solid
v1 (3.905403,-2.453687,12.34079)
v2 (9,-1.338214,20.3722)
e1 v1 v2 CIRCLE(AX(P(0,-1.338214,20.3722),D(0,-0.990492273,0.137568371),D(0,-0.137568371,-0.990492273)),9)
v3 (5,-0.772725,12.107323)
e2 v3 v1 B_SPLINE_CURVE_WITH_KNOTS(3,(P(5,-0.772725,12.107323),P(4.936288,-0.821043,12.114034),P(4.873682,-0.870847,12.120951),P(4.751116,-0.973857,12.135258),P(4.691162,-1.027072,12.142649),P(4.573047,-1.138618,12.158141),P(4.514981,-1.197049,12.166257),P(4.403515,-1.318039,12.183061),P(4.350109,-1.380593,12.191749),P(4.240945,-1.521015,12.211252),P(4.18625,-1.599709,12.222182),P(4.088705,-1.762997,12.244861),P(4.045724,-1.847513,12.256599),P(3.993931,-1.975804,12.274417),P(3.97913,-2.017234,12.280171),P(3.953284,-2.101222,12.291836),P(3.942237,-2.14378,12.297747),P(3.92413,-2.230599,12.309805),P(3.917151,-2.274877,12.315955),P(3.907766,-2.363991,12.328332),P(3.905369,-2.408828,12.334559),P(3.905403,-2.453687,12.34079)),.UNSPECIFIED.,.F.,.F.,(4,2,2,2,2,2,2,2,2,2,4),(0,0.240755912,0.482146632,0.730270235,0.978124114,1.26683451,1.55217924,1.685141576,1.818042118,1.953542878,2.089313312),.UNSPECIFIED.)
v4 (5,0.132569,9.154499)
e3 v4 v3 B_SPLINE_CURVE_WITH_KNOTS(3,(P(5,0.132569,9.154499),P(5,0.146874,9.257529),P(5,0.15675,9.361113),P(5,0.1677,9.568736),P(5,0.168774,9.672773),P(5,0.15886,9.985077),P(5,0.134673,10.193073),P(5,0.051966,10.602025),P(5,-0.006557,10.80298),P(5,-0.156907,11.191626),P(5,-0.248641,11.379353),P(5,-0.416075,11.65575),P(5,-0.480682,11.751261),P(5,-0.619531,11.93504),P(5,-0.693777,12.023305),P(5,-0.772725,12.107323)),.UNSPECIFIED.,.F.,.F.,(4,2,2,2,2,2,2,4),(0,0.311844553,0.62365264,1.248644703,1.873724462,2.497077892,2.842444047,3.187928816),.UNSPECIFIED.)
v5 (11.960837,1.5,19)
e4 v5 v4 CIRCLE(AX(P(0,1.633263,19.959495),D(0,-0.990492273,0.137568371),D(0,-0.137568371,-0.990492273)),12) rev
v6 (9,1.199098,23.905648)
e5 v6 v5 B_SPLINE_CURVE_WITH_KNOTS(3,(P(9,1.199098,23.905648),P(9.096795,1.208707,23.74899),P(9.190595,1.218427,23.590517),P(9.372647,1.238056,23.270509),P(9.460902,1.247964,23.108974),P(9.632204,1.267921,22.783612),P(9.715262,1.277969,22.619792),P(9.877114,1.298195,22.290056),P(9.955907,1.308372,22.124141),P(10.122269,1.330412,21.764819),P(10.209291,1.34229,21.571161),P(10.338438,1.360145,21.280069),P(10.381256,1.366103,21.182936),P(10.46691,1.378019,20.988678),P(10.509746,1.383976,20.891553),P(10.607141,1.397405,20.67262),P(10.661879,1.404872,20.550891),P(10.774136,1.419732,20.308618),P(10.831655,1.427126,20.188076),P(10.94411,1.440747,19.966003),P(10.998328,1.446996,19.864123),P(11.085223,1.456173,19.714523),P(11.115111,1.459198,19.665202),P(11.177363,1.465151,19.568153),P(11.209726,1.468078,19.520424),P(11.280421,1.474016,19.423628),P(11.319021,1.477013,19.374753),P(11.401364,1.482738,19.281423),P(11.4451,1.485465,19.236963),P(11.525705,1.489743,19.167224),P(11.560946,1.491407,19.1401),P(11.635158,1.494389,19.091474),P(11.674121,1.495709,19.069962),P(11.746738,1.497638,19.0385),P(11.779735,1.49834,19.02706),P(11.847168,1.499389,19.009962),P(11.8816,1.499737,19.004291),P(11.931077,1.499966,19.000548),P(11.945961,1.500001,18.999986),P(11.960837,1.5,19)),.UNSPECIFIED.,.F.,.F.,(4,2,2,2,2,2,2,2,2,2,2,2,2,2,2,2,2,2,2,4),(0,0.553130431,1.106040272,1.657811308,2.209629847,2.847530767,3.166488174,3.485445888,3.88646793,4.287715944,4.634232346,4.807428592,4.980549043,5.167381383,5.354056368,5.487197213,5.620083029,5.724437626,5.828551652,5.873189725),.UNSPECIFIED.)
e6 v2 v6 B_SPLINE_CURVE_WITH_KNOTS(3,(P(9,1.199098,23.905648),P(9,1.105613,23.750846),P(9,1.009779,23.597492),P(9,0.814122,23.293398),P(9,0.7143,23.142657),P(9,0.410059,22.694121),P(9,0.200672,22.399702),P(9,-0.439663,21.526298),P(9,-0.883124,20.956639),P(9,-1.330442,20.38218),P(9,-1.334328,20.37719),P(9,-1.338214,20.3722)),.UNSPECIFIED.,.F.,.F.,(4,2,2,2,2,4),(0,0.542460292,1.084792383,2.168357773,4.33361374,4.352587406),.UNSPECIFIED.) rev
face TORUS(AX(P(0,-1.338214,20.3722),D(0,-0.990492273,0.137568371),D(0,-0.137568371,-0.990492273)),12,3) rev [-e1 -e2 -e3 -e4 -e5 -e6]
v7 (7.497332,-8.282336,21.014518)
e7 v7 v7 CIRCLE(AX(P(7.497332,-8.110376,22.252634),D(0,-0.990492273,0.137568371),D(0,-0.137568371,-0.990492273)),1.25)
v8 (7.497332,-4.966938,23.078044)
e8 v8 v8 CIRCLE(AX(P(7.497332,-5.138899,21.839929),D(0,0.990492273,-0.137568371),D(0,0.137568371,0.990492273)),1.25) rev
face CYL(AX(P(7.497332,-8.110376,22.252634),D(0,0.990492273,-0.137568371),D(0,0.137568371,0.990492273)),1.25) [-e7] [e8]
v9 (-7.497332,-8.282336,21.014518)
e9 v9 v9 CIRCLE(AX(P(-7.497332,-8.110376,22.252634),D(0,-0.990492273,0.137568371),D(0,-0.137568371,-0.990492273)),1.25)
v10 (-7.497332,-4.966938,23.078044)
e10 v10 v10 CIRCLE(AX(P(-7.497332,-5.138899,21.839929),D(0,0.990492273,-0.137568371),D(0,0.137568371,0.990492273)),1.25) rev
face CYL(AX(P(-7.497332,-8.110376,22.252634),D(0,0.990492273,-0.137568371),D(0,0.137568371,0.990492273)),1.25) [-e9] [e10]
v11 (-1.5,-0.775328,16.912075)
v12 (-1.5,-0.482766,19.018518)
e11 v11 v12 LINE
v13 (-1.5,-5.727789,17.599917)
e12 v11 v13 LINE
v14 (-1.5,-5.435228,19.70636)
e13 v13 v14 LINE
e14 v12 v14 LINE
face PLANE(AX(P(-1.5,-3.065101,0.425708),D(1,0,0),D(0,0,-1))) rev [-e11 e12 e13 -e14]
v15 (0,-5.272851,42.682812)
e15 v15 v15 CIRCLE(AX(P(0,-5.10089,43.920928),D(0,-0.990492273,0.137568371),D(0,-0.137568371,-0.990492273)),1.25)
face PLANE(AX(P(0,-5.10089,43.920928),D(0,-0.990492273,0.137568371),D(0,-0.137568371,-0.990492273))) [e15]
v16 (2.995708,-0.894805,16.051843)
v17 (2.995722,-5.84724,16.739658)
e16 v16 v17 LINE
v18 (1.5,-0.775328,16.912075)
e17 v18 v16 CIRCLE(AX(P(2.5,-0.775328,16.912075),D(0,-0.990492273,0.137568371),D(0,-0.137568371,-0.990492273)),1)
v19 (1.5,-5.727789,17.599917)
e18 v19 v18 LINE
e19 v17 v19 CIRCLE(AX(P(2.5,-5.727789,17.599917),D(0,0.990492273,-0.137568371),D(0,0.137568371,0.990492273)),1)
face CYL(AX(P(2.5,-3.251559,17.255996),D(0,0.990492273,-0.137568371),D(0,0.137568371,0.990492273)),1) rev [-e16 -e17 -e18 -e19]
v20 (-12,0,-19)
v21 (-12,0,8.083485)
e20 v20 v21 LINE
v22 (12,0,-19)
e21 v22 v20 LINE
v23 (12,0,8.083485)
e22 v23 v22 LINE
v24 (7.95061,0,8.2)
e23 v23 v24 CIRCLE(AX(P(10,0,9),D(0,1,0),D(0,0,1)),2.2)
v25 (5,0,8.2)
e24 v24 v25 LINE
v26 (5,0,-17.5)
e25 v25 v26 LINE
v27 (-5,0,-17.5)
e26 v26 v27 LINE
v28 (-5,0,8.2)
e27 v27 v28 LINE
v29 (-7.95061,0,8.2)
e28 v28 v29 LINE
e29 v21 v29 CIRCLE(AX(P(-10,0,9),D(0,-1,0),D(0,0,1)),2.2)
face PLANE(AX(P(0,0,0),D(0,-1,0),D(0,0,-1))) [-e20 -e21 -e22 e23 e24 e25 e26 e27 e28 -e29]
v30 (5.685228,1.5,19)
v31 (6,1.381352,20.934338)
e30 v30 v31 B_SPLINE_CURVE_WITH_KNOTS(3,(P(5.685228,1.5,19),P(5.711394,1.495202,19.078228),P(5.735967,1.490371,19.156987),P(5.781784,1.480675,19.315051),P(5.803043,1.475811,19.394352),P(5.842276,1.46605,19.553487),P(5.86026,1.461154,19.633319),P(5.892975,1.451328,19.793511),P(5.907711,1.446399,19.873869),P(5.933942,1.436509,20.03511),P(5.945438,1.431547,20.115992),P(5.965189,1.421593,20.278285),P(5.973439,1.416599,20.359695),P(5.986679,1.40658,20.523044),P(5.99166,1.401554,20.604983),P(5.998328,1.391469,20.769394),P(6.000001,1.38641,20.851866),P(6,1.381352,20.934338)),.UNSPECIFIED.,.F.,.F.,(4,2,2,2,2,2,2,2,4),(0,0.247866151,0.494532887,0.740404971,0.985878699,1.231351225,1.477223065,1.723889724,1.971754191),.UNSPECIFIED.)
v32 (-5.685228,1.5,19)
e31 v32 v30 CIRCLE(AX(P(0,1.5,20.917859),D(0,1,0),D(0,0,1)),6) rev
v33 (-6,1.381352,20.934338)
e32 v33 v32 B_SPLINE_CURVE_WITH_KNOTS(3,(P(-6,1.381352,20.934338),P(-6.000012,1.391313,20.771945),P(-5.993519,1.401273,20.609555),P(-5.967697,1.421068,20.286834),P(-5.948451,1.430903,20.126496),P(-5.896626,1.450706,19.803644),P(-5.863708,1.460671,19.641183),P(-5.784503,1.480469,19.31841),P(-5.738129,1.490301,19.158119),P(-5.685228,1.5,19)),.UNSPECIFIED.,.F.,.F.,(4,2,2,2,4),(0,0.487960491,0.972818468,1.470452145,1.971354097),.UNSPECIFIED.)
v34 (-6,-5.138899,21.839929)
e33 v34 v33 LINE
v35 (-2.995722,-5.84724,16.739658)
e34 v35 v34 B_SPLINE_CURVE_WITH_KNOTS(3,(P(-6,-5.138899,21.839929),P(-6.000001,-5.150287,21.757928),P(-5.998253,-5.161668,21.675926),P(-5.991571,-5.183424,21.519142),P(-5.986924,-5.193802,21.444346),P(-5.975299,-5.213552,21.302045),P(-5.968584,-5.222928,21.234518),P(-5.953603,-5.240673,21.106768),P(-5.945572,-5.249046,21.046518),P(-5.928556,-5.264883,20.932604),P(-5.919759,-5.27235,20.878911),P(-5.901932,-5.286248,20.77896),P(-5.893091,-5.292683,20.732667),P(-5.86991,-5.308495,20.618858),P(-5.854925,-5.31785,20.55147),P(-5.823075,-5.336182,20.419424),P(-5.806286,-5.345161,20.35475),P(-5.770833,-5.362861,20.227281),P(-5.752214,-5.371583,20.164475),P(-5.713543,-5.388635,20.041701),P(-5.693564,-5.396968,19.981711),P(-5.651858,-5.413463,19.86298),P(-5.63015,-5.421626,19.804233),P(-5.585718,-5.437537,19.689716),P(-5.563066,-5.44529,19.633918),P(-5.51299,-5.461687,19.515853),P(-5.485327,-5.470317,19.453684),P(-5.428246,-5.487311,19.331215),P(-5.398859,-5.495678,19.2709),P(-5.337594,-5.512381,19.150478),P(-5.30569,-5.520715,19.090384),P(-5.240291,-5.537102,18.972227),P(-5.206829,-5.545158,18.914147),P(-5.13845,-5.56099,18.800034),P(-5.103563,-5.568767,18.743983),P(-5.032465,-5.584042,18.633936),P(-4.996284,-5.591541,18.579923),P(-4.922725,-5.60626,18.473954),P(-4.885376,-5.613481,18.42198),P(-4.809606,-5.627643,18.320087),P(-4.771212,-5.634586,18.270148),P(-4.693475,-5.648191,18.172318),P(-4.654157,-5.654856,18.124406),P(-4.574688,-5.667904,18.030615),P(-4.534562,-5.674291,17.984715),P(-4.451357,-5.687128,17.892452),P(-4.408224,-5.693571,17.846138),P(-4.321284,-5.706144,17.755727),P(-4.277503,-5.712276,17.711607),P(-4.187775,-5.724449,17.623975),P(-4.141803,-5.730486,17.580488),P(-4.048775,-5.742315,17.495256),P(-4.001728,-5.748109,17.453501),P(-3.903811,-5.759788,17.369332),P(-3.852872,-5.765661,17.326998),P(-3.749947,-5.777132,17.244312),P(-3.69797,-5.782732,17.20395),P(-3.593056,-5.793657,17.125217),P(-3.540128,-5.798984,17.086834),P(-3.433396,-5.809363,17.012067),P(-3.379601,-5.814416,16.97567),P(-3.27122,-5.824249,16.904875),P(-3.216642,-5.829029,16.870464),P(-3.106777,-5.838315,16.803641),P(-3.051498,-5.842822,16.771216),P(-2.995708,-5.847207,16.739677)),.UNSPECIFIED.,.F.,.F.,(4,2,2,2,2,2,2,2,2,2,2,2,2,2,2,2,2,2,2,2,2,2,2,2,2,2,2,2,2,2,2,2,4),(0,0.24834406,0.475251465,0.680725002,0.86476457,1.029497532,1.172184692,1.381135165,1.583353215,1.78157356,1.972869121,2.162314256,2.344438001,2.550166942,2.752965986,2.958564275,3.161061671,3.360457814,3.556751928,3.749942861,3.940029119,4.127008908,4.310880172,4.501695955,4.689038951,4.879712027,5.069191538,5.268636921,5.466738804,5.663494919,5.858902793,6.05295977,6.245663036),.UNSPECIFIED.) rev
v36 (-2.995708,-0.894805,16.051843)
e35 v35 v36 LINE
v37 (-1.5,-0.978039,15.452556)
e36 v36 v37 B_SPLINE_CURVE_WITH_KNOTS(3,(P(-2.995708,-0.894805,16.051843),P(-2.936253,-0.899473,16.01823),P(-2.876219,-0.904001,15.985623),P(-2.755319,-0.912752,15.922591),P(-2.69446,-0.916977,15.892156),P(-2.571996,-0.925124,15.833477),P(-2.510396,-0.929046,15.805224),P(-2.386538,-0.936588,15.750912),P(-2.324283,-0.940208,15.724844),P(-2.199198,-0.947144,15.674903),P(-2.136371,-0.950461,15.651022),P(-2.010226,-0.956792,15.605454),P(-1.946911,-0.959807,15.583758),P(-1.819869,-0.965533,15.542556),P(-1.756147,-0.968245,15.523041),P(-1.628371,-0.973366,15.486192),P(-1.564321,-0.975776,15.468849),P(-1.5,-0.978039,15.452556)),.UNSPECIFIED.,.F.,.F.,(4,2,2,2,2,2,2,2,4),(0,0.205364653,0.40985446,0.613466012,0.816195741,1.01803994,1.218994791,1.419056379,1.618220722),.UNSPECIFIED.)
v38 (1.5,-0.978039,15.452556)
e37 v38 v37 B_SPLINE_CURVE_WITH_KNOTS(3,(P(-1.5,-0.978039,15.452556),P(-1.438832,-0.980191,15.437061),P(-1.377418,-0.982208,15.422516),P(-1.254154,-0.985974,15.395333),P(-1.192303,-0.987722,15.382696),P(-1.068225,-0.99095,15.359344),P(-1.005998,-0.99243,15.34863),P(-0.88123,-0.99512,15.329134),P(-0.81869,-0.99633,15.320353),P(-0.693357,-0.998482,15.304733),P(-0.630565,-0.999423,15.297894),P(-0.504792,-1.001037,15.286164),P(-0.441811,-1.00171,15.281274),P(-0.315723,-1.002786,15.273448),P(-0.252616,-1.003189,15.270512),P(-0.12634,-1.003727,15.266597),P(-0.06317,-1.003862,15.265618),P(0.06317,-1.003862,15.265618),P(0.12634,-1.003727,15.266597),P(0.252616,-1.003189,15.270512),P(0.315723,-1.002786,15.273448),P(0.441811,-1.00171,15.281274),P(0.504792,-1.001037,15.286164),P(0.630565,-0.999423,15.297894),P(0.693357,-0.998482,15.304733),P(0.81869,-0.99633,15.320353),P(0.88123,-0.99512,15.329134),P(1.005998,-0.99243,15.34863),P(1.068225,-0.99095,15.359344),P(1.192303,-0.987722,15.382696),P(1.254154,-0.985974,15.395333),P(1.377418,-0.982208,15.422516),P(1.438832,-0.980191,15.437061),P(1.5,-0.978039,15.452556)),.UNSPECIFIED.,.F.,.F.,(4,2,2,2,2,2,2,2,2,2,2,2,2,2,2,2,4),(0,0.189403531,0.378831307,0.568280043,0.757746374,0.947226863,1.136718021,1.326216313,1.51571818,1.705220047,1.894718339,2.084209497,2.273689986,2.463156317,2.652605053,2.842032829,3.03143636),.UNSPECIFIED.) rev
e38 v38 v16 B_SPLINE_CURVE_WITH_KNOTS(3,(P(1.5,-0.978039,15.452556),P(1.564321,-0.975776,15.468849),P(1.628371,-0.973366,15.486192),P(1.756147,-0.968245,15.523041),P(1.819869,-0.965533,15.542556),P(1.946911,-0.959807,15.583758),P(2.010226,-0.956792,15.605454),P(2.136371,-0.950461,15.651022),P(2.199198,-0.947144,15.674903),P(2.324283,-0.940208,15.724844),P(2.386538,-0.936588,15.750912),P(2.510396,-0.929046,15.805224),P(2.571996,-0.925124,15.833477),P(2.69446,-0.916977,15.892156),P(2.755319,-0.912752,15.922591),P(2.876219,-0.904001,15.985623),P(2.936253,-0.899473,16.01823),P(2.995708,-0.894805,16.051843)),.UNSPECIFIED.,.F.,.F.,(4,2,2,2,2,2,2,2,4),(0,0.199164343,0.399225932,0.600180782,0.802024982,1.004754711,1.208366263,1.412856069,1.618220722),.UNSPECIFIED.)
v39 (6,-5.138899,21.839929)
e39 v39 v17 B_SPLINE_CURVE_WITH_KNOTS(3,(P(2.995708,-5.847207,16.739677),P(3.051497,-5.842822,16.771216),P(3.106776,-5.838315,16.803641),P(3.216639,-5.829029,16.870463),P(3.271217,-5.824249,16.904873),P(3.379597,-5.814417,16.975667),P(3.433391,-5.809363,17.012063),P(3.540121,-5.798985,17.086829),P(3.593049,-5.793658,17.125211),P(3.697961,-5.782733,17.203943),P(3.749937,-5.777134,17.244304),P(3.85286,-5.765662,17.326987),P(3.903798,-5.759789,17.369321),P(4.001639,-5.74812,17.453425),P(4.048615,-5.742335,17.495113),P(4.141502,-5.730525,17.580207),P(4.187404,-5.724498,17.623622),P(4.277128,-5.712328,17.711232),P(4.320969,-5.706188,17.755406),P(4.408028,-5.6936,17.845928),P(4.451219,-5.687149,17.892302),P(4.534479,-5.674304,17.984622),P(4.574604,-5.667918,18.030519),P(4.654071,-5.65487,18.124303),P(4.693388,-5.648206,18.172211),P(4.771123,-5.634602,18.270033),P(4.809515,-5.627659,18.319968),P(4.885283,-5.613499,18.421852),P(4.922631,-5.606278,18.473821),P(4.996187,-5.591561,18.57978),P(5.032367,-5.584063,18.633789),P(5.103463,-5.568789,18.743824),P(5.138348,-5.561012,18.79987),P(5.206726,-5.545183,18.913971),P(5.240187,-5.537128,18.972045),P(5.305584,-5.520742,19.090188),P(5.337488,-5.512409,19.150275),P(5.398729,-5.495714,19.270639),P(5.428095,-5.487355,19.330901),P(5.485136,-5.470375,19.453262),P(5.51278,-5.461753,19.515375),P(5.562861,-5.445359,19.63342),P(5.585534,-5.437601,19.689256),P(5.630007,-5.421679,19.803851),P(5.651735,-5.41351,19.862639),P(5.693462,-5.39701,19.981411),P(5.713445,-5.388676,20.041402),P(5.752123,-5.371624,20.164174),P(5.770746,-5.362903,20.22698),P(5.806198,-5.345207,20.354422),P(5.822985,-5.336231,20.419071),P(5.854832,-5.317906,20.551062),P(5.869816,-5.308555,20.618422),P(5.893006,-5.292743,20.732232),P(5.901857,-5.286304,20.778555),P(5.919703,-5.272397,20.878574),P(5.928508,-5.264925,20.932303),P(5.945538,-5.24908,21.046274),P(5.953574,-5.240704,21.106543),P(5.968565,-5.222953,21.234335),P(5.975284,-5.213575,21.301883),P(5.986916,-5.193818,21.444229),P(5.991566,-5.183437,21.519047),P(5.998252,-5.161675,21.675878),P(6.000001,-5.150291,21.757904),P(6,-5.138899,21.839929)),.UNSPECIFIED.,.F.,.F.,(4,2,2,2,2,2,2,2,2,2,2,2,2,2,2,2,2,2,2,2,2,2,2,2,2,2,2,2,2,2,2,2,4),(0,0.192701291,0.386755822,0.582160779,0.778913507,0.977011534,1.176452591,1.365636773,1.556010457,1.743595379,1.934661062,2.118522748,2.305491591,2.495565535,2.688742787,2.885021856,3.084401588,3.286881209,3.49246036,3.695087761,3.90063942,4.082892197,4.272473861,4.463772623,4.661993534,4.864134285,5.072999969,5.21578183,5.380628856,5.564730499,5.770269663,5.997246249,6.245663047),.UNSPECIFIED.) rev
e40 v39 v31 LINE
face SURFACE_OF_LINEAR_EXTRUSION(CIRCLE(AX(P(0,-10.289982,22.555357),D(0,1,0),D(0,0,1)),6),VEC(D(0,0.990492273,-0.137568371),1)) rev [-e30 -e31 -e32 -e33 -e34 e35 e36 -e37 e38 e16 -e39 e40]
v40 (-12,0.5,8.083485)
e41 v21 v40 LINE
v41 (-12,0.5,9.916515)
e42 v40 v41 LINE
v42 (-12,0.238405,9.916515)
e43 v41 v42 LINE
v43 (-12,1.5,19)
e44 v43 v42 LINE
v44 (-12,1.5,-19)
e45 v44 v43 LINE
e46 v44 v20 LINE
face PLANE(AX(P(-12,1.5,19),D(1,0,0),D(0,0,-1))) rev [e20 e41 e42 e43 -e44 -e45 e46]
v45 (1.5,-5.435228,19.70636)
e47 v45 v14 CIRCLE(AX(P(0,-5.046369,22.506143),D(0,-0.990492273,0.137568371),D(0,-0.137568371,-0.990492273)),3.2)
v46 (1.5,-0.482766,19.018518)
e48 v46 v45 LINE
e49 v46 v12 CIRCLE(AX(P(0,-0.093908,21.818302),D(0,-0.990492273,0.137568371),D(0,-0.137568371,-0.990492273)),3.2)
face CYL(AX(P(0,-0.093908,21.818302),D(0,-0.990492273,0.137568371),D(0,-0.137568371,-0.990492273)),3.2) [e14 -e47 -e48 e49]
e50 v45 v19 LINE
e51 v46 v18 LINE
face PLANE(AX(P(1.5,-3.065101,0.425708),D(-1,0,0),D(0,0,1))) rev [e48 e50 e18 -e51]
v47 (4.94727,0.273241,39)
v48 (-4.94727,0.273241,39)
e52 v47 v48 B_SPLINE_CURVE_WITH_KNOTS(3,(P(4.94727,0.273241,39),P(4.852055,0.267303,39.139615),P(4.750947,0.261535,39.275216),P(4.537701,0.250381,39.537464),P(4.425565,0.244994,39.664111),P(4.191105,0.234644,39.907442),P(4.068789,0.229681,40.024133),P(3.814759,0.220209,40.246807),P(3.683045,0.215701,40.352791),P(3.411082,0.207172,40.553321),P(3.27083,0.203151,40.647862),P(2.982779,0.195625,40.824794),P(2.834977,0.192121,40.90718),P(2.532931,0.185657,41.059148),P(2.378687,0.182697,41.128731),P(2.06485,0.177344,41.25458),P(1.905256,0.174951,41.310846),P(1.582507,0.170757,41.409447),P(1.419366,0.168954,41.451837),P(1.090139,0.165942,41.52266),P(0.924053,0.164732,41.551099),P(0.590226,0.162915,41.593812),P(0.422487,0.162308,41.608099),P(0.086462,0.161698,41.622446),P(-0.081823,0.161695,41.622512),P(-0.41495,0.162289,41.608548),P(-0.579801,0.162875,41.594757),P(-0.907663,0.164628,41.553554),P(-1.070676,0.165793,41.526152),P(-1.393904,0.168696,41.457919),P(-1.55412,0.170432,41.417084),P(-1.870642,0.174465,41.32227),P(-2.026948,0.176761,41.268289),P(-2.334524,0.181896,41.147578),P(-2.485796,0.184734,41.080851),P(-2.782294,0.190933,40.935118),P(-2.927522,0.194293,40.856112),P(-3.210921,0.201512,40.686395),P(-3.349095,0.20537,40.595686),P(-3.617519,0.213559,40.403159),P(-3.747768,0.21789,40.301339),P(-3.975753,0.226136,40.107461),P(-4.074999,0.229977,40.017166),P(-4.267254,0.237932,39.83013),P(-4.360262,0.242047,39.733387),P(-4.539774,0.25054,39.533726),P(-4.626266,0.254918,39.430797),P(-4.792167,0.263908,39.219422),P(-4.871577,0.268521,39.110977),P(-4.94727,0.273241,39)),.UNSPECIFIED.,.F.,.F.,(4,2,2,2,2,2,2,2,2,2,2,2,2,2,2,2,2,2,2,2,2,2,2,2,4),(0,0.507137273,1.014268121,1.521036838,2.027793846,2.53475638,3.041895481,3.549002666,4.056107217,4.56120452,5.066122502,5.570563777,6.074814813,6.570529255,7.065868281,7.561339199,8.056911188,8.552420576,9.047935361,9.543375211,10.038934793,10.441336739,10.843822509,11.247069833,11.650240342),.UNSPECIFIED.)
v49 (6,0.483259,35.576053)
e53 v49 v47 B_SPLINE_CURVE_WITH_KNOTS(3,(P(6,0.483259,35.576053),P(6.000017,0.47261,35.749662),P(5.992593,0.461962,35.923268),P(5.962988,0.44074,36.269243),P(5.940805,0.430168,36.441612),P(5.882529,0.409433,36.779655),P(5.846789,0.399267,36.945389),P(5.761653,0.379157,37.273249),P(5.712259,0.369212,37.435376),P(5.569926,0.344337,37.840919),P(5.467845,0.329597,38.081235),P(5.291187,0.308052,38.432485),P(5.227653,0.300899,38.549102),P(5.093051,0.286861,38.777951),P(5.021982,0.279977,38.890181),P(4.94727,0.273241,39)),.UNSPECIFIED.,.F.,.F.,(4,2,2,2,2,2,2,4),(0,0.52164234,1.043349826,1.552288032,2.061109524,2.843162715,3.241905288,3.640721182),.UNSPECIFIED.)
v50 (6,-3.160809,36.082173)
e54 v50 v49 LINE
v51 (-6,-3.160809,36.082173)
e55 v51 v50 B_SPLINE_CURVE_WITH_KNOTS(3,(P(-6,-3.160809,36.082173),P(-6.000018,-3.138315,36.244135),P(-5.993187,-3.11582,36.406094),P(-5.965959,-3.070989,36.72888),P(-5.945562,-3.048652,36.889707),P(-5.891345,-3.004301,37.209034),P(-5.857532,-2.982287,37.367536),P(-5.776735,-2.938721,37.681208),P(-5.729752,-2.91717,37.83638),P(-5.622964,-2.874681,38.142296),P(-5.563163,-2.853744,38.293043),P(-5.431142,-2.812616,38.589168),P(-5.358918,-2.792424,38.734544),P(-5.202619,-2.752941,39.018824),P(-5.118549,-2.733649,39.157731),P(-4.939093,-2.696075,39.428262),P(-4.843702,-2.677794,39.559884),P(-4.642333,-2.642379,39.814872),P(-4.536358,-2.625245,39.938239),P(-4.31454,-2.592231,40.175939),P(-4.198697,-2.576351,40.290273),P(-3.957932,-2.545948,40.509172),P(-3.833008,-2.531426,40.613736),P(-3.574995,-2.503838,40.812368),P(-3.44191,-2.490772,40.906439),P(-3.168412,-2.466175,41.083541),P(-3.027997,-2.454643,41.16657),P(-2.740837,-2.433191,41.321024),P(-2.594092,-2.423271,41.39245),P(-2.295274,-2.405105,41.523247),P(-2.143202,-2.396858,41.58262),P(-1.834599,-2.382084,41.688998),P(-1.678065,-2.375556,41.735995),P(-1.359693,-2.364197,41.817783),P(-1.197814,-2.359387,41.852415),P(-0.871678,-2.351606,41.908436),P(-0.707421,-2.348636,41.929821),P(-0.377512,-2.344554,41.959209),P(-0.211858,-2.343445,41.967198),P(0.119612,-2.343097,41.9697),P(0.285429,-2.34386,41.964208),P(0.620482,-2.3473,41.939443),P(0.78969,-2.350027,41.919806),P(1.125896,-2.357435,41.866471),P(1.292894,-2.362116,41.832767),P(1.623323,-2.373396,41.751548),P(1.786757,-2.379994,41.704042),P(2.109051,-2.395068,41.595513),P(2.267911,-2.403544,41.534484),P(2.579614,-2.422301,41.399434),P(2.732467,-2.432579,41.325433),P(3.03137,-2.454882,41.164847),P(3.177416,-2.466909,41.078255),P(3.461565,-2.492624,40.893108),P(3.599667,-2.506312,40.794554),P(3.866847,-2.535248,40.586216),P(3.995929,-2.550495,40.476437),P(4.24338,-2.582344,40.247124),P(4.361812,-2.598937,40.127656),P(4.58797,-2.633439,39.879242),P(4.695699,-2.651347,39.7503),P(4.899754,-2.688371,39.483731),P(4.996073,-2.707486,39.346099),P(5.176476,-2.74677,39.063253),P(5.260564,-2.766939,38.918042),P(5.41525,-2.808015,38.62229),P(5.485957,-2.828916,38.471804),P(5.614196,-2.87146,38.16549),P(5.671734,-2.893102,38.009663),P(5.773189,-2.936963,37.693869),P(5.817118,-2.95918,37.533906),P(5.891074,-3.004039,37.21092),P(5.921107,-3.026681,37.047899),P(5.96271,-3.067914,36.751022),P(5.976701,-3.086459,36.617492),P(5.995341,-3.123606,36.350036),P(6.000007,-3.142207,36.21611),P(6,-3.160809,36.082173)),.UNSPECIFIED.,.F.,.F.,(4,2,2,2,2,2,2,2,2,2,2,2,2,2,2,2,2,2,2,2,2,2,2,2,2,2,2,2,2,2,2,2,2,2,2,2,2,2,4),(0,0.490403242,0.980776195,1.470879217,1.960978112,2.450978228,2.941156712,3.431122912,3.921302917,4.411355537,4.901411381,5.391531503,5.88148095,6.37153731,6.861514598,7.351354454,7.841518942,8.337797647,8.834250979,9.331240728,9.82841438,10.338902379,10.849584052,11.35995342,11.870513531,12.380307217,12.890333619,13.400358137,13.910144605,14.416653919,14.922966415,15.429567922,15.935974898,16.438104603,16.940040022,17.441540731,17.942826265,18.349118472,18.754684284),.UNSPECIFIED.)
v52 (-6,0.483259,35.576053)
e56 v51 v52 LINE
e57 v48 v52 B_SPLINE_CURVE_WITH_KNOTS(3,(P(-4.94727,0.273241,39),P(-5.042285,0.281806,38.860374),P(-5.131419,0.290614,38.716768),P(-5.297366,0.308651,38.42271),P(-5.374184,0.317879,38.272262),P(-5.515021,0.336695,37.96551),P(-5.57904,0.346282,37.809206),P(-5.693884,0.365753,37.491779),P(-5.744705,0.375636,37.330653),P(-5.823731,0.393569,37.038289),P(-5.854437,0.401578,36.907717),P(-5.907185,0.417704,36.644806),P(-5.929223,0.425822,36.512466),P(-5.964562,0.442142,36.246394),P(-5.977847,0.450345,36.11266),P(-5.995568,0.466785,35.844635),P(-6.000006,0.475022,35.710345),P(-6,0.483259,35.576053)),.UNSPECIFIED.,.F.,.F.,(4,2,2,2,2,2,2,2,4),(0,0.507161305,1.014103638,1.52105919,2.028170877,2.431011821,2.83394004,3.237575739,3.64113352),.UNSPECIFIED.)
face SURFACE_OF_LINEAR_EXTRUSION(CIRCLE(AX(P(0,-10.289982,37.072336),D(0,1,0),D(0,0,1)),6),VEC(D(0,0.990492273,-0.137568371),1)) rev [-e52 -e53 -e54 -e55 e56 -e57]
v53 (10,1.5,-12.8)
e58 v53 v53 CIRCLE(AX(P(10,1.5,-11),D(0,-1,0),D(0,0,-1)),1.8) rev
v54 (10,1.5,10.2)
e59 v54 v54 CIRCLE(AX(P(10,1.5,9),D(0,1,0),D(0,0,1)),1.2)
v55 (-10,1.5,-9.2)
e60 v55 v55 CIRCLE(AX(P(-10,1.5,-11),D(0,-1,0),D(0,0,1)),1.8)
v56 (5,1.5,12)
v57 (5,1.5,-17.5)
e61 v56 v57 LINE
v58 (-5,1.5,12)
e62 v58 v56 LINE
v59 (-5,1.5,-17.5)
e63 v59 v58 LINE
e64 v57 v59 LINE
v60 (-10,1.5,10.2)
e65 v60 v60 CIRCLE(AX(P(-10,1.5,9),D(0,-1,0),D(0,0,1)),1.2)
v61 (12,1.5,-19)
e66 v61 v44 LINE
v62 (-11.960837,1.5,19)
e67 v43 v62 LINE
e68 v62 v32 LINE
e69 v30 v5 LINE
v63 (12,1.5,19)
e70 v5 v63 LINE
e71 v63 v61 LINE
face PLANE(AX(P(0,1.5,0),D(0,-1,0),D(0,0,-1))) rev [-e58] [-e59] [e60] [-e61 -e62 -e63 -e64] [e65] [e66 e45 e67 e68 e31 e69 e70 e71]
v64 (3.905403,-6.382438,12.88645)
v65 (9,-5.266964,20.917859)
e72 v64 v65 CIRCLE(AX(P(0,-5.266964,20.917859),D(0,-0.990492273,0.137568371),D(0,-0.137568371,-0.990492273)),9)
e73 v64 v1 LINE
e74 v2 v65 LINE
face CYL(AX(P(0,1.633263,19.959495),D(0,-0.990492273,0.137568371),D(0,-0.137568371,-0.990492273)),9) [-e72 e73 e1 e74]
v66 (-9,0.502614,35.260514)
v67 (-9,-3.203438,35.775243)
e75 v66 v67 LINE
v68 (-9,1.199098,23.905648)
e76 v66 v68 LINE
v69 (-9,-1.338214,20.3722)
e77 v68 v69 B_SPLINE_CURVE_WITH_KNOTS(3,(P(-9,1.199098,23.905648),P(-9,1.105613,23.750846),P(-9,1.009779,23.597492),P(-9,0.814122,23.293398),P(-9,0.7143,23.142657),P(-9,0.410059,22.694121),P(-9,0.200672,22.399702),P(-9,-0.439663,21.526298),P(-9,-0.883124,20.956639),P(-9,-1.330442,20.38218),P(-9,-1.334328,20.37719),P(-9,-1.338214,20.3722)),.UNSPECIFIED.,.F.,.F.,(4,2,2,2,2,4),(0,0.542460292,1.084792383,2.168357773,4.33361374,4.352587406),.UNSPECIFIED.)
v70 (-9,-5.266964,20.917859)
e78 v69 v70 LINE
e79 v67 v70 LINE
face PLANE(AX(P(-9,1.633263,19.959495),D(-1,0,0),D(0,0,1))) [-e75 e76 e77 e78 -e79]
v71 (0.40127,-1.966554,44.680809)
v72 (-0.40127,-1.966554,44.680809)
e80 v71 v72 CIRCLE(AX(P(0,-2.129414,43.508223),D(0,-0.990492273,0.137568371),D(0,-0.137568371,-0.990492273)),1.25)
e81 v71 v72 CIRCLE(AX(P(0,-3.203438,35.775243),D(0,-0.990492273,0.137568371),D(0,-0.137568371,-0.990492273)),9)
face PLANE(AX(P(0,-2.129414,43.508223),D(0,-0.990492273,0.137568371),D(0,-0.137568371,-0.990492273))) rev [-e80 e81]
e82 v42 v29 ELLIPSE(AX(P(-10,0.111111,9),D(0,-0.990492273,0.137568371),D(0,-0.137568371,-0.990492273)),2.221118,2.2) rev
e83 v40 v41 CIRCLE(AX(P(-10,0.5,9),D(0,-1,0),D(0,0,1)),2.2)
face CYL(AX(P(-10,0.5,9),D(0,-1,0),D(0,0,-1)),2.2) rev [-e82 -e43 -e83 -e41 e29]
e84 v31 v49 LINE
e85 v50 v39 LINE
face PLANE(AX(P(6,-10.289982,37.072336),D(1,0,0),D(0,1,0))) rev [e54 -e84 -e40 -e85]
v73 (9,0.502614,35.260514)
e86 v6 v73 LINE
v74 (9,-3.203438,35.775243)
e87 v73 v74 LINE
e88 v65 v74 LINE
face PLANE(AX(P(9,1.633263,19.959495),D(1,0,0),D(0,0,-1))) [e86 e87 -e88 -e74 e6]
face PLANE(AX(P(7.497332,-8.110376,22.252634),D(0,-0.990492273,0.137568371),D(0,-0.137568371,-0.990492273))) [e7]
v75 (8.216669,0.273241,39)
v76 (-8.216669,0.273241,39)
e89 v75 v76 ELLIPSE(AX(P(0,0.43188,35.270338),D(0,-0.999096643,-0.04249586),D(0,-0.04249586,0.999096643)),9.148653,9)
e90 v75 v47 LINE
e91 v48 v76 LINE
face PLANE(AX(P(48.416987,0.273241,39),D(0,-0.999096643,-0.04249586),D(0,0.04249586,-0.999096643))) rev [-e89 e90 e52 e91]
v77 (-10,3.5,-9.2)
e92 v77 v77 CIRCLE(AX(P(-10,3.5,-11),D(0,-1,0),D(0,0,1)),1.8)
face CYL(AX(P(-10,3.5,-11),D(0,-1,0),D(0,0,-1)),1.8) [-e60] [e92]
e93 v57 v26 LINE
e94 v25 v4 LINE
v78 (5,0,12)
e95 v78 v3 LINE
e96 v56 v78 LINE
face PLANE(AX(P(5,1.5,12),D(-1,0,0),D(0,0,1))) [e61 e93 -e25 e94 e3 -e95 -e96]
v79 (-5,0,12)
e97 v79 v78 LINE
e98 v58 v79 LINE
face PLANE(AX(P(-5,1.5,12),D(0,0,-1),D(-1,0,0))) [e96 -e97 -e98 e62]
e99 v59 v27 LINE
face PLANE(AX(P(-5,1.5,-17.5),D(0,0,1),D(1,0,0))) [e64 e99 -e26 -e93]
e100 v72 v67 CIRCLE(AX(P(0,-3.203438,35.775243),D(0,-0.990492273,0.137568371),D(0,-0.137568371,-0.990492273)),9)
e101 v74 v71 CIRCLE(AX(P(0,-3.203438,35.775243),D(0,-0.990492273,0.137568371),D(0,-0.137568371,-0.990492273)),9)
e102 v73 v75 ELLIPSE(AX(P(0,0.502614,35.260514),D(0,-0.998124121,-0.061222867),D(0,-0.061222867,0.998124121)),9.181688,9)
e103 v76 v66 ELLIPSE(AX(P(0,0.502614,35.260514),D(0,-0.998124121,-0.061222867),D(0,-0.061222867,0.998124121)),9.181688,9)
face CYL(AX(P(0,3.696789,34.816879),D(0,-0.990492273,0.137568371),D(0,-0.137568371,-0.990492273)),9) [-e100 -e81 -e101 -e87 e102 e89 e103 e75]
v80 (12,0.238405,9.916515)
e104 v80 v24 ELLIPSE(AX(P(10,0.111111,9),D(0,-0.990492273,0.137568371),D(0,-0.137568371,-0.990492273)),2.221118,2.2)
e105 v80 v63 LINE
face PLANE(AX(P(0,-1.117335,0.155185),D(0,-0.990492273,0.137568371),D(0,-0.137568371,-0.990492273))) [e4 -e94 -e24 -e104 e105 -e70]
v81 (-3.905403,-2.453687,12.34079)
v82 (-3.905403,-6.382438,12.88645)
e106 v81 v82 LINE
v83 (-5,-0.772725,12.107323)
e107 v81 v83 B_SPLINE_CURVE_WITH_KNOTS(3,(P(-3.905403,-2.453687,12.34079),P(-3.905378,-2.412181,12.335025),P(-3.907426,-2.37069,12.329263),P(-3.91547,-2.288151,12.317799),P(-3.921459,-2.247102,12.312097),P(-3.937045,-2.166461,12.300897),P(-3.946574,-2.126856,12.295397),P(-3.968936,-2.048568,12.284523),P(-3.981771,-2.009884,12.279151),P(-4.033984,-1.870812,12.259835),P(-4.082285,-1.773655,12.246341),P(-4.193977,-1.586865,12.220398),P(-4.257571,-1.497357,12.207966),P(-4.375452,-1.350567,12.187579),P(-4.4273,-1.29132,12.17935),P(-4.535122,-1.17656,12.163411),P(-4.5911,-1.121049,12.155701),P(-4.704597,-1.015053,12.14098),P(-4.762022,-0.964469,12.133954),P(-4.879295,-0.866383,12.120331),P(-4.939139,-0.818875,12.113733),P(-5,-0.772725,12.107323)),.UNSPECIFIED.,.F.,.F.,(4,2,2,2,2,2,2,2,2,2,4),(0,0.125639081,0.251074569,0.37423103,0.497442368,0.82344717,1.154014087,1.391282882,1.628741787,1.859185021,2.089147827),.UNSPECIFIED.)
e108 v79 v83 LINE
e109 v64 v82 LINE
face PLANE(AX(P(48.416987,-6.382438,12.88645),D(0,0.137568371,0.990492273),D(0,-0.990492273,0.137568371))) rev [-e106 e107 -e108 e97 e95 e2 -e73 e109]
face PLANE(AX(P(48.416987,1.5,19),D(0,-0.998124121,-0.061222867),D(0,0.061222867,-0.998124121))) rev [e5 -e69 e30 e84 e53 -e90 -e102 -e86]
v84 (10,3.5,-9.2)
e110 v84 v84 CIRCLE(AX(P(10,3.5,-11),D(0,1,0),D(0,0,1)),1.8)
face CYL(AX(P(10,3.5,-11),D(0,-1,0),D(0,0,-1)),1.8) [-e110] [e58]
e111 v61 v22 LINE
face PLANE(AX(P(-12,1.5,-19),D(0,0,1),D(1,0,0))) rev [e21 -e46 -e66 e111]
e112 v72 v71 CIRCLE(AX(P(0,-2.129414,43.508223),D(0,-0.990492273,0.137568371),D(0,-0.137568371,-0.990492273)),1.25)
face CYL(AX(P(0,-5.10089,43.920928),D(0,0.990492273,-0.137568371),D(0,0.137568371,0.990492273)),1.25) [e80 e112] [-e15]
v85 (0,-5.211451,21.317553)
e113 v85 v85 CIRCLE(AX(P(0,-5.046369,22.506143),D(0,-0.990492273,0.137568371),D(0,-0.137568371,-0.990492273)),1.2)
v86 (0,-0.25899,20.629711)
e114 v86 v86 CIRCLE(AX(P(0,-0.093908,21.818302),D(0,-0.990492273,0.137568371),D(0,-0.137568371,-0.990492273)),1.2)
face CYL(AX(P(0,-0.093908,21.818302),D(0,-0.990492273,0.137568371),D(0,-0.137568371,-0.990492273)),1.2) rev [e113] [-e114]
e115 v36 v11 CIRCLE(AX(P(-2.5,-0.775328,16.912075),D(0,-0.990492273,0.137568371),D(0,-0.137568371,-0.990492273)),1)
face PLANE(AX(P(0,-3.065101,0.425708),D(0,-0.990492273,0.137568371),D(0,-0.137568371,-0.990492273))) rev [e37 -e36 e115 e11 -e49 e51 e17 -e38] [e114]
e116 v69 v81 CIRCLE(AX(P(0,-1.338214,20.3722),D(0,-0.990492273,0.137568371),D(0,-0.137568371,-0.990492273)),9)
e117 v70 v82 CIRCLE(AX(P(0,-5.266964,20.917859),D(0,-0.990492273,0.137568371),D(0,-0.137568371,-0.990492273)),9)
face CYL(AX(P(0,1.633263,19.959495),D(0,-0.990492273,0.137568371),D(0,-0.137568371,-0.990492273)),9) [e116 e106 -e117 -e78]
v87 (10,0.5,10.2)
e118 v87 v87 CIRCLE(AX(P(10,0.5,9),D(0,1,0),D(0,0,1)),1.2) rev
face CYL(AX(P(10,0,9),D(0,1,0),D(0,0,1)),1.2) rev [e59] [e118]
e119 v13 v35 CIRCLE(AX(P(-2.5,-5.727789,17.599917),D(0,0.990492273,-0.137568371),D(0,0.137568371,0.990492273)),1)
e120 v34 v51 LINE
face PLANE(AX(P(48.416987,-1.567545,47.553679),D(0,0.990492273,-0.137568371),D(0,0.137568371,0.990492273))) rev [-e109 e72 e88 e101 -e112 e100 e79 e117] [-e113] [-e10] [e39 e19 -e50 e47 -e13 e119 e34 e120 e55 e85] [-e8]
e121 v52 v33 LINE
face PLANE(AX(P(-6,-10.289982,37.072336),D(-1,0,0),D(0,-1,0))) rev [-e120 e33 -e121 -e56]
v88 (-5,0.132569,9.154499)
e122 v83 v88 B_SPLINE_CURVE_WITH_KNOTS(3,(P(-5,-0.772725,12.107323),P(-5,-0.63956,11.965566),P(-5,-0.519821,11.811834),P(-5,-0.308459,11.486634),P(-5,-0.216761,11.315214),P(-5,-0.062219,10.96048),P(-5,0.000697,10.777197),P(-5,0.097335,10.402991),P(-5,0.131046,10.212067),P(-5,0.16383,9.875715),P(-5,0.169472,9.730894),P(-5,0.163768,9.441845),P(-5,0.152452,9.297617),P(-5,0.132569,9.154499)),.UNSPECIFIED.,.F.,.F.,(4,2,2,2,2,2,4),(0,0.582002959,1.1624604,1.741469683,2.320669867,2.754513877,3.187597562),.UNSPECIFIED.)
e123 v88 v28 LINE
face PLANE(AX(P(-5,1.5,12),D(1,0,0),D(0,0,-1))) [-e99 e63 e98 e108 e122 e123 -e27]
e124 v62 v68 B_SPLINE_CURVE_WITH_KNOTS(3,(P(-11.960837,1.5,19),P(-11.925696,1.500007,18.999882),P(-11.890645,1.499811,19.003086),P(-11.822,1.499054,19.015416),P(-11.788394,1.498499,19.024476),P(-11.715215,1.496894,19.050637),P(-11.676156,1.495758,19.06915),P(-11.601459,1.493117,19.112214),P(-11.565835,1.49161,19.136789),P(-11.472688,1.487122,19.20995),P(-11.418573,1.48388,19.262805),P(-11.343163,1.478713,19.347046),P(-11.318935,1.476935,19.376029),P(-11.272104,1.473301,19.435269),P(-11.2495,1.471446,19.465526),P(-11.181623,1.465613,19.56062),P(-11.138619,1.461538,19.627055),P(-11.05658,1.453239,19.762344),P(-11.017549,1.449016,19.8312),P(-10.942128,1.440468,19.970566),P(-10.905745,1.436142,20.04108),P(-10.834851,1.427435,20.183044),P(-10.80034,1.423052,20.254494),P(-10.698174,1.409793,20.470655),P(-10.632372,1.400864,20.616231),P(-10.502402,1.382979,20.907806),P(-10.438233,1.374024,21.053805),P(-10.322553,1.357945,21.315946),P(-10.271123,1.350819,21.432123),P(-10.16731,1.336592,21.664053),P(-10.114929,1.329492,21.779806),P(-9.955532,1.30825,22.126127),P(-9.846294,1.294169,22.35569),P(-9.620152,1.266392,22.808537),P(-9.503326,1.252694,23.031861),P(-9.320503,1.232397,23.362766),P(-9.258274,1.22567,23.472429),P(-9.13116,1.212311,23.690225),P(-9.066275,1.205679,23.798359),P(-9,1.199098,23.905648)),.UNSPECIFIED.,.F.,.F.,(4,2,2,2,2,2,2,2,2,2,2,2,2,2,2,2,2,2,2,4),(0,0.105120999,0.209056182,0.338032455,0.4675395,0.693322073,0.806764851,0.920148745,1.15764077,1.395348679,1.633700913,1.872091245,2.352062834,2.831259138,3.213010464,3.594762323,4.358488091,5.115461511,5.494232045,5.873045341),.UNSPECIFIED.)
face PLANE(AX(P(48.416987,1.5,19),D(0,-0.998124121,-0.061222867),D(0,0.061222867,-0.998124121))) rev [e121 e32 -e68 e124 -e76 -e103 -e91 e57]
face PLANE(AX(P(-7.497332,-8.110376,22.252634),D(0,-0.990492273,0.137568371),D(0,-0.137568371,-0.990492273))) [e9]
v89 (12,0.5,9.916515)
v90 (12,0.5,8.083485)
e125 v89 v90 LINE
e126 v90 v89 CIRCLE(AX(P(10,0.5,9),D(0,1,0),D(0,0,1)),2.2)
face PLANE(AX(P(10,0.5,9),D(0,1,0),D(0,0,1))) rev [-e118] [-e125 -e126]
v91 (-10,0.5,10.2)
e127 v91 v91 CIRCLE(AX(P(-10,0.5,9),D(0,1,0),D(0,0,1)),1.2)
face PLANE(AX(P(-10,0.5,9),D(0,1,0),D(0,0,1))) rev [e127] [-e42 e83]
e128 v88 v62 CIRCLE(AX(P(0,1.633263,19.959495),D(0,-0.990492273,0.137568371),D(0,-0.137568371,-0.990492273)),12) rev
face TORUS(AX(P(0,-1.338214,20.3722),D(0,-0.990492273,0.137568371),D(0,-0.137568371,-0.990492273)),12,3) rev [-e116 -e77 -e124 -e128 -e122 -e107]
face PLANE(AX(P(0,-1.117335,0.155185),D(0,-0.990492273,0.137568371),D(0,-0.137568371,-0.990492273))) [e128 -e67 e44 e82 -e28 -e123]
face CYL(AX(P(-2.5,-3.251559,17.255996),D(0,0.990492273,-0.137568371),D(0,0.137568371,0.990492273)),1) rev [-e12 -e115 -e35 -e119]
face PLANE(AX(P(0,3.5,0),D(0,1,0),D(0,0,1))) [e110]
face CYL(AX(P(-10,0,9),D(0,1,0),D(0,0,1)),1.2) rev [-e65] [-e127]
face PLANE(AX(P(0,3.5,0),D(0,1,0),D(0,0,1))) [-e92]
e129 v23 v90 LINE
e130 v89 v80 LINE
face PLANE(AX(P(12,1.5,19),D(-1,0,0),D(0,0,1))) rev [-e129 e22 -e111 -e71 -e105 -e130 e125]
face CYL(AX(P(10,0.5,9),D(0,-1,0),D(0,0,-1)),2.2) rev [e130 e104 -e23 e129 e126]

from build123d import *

# Parameters (mm, degrees)
ESQUISSE1_W               = 24
ESQUISSE1_H               = 38
ESQUISSE1_W_2             = 10.000000000000004
ESQUISSE1_H_2             = 29.499999999999996
SHAPE_DEPTH               = 1.5
ESQUISSE2_R               = 1.2000000000000004
VISHOLES_DEPTH            = 1.5
ESQUISSE3_R               = 1.7999999999999987
LOCKERS_DEPTH             = 2
ESQUISSE4_R               = 2.2
SCREWHATREMOVER_DEPTH     = 0.5
SUPPORT_REACH             = 24.743
SUPPORT_DIRECTION_2_REACH = 24.743
SHAPER_START              = -6.966462
ESQUISSE9_W               = 37.86778750077029
ESQUISSE9_H               = 40.82669381021731
SHAPER_ROUND_DEPTH        = 6.966462
HOLE_MIDDLE_DEPTH         = 48.39948931246374
ESQUISSE13_R              = 3.2
ESQUISSE13_R_2            = 1.2
VISFIXATION_DEPTH         = 5
CONG_1_R                  = 1
ESQUISSE15_R              = 1.2500000000000013
ESQUISSE15_R_2            = 1.2500000000000004
PLOTS_DEPTH               = 3
CONG_2_R                  = 3


with BuildPart() as part:
    # Esquisse1 → Shape (new body)
    with BuildSketch(Plane(origin=(0, 0, 0), x_dir=(1, 0, 0), z_dir=(0, 1, 0))):
        Rectangle(ESQUISSE1_W, ESQUISSE1_H)
        with Locations((2.22e-15, 2.7500000000000018)):
            Rectangle(ESQUISSE1_W_2, ESQUISSE1_H_2, mode=Mode.SUBTRACT)
    extrude(amount=SHAPE_DEPTH)

    # Esquisse2 → VisHoles (cut)
    with BuildSketch(Plane(origin=(0, 1.5, 0), x_dir=(1, 0, 0), z_dir=(0, 1, 0))):
        with Locations(Location((10.000000000000002, -8.999999999999993, 0), (0, 0, 270))):
            Circle(ESQUISSE2_R)
    visholes = extrude(amount=-VISHOLES_DEPTH, mode=Mode.SUBTRACT)

    # Esquisse3 → Lockers (add)
    with BuildSketch(Plane(origin=(0, 1.5, 0), x_dir=(1, 0, 0), z_dir=(0, 1, 0))):
        with Locations(Location((10.000000000000002, 11.000000000000007, 0), (0, 0, 90))):
            Circle(ESQUISSE3_R)
    lockers = extrude(amount=LOCKERS_DEPTH)

    # Esquisse4 → ScrewHatRemover (cut)
    with BuildSketch(Plane(origin=(0, 0, 0), x_dir=(1, 0, 0), z_dir=(0, 1, 0))):
        with Locations((10.000000000000002, -8.999999999999993)):
            Circle(ESQUISSE4_R)
    screwhatremover = extrude(amount=SCREWHATREMOVER_DEPTH, mode=Mode.SUBTRACT)

    # Symétrie1: VisHoles, Lockers, ScrewHatRemover across plane
    add(visholes.mirror(Plane(origin=(0, 0, 0), x_dir=(0, 0, 1), z_dir=(1, 0, 0))), mode=Mode.SUBTRACT)
    add(lockers.mirror(Plane(origin=(0, 0, 0), x_dir=(0, 0, 1), z_dir=(1, 0, 0))))
    add(screwhatremover.mirror(Plane(origin=(0, 0, 0), x_dir=(0, 0, 1), z_dir=(1, 0, 0))), mode=Mode.SUBTRACT)

    # Support: up to this face of the body (flat: up to its plane)
    support_end = Plane(part.part.faces().sort_by_distance((12, 0.75817099, -0.147077812))[0])
    # Esquisse8 → Support (add, up to the picked face)
    with BuildSketch(Plane(origin=(0, 0, 0), x_dir=(0, 0, -1), z_dir=(1, 0, 0)), mode=Mode.PRIVATE) as support_sk1:
        Polygon((-18.999999999999996, 1.5), (-38.99999999999999, 0.273241418675476), (-47.34732666365826, -0.08180614293195024), (-47.55367922057029, -1.5675445526985776), (-12.88644965934898, -6.3824375473126445), (-11.999999999999996, 0), (-11.999999999999996, 1.5), align=None)
    support_tool1 = split(extrude(support_sk1.sketch, amount=SUPPORT_REACH, mode=Mode.PRIVATE), bisect_by=support_end, keep=Keep.BOTH, mode=Mode.PRIVATE)
    add(support_tool1.solids().sort_by(Axis((0, -1.747723, 25.831509), (1, 0, 0)))[0])

    # Support direction 2: up to this face of the body (flat: up to its plane)
    support_direction_2_end = Plane(part.part.faces().sort_by_distance((-12, 0.75817099, -0.147077812))[0])
    # Esquisse8 → Support direction 2 (add, up to the picked face)
    with BuildSketch(Plane(origin=(0, 0, 0), x_dir=(0, 0, -1), z_dir=(1, 0, 0)), mode=Mode.PRIVATE) as support_direction_2_sk1:
        Polygon((-18.999999999999996, 1.5), (-38.99999999999999, 0.273241418675476), (-47.34732666365826, -0.08180614293195024), (-47.55367922057029, -1.5675445526985776), (-12.88644965934898, -6.3824375473126445), (-11.999999999999996, 0), (-11.999999999999996, 1.5), align=None)
    support_direction_2_tool1 = split(extrude(support_direction_2_sk1.sketch, amount=-SUPPORT_DIRECTION_2_REACH, mode=Mode.PRIVATE), bisect_by=support_direction_2_end, keep=Keep.BOTH, mode=Mode.PRIVATE)
    add(support_direction_2_tool1.solids().sort_by(Axis((0, -1.747723, 25.831509), (-1, 0, 0)))[0])

    # Esquisse9 → Shaper Round (cut)
    with BuildSketch(Plane(origin=(0, -8.017562452687358, 1.1135503406510208), x_dir=(1, 0, 0), z_dir=(0, -0.9904922731777516, 0.1375683712746876)).offset(SHAPER_START)):
        with Locations((3.55e-15, 27.4944104504371)):
            Rectangle(ESQUISSE9_W, ESQUISSE9_H)
        with BuildLine():
            Line((-8.999999999999998, 19.994410450437105), (-9.000000000000002, 34.994410450437094))
            ThreePointArc((-9.000000000000002, 34.994410450437094), (-2.38e-15, 43.99441045043709), (8.999999999999998, 34.99441045043711))
            Line((8.999999999999998, 34.99441045043711), (9.000000000000002, 19.9944104504371))
            ThreePointArc((9.000000000000002, 19.9944104504371), (4.37e-15, 10.994410450437105), (-8.999999999999998, 19.994410450437105))
        make_face(mode=Mode.SUBTRACT)
    extrude(amount=SHAPER_ROUND_DEPTH, mode=Mode.SUBTRACT)

    # Esquisse10 → Hole Middle (cut, through all, along a direction that is not the sketch's normal)
    with BuildSketch(Plane(origin=(0, 1.5, 0), x_dir=(1, 0, 0), z_dir=(0, 1, 0))):
        with BuildLine():
            Line((-5.999999999999987, -35.43483867777678), (-5.9999999999999885, -20.917859398553457))
            ThreePointArc((-5.9999999999999885, -20.917859398553457), (1.17e-15, -14.917859398553464), (5.999999999999996, -20.917859398553453))
            Line((5.999999999999996, -20.917859398553453), (6, -35.43483867777678))
            ThreePointArc((6, -35.43483867777678), (2.37e-15, -41.434838677776774), (-5.999999999999987, -35.43483867777678))
        make_face()
    extrude(amount=-HOLE_MIDDLE_DEPTH, dir=(0, 0.9904922731777516, -0.1375683712746876), mode=Mode.SUBTRACT)

    # Esquisse13 → VisFixation (add)
    # profile 1 of 3: a face of its own
    with BuildSketch(Plane(origin=(0, -8.017562452687361, 1.113550340651021), x_dir=(1, 0, 0), z_dir=(0, -0.9904922731777517, 0.13756837127468763))):
        with Locations((0, 21.597940400544502)):
            Circle(ESQUISSE13_R)
        with Locations(Location((0, 21.597940400544502, 0), (0, 0, 270))):
            Circle(ESQUISSE13_R_2, mode=Mode.SUBTRACT)
    # profile 2 of 3: a face of its own
    with BuildSketch(Plane(origin=(0, -8.017562452687361, 1.113550340651021), x_dir=(1, 0, 0), z_dir=(0, -0.9904922731777517, 0.13756837127468763))):
        with BuildLine():
            Line((0, 18.397940400544503), (0, 14.982377023575253))
            add(Edge.make_bspline(
                [(1.5000000000001044, 15.171090545997824), (1.3165092525639652, 15.124163886966414), (1.1313027330194316, 15.083796255686536), (0.9446588561097172, 15.050059603842444), (0.7568613118110248, 15.023012412419297), (0.5681991290207293, 15.002699172445709), (0.3789668557867015, 14.989149535001376), (0.1894648811528625, 14.982377024321183), (3.91e-14, 14.982377023575259)],
                knots=[0.4195697909851019, 0.4195697909851019, 0.4195697909851019, 0.4195697909851019, 0.4195697909851019, 0.4195697909851019, 0.4195697909851019, 0.4195697909851019, 0.4195697909851019, 0.49999870403978586, 0.49999870403978586, 0.49999870403978586, 0.49999870403978586, 0.49999870403978586, 0.49999870403978586, 0.49999870403978586, 0.49999870403978586, 0.49999870403978586], degree=8))
            Line((1.4999999999999996, 15.171090545997846), (1.4999999999999991, 18.771281595523988))
            ThreePointArc((1.4999999999999991, 18.771281595523988), (0.772881563997472, 18.49267807860891), (-5.9e-16, 18.397940400544503))
        make_face()
    # profile 3 of 3: a face of its own
    with BuildSketch(Plane(origin=(0, -8.017562452687361, 1.113550340651021), x_dir=(1, 0, 0), z_dir=(0, -0.9904922731777517, 0.13756837127468763))):
        with BuildLine():
            add(Edge.make_bspline(
                [(3.913e-14, 14.982377023575255), (-0.00266127699223137, 14.982377023564778), (-0.0053225466660317, 14.982378359757066), (-0.00798380817114017, 14.982381032139322), (-0.01064506065708574, 14.982385040698047), (-0.01330630327314769, 14.982390385419032), (-0.01596753516835533, 14.982397066287362), (-0.01862875549148768, 14.98240508328741), (-0.20809024321261407, 14.983070967063233), (-0.39490442545846705, 14.990311027604342), (-0.5814380400367319, 15.004138180929463), (-0.7674028136479139, 15.024538791186018), (-0.9525161219652903, 15.051483922349174), (-1.1365006719690984, 15.084930563413701), (-1.319084319955278, 15.12482244473297), (-1.500000000000116, 15.171090545888504)],
                knots=[0.49999870403978586, 0.49999870403978586, 0.49999870403978586, 0.49999870403978586, 0.49999870403978586, 0.49999870403978586, 0.49999870403978586, 0.49999870403978586, 0.49999870403978586, 0.5011284311666464, 0.5011284311666464, 0.5011284311666464, 0.5011284311666464, 0.5011284311666464, 0.5011284311666464, 0.5011284311666464, 0.580428264694274, 0.580428264694274, 0.580428264694274, 0.580428264694274, 0.580428264694274, 0.580428264694274, 0.580428264694274, 0.580428264694274, 0.580428264694274], degree=8))
            Line((0, 14.982377023575253), (0, 18.397940400544503))
            ThreePointArc((-5.9e-16, 18.397940400544503), (-0.7728815639974731, 18.49267807860891), (-1.5000000000000027, 18.771281595523988))
            Line((-1.5, 18.771281595523988), (-1.5, 15.171090545888532))
        make_face()
    extrude(amount=-VISFIXATION_DEPTH)

    # Congé1
    cong_1_edges = [part.edges().sort_by_distance(p)[0] for p in [
        (-1.500000000000058, -3.454269552884287, 15.796477373846919),
        (1.500000000000052, -3.454269552869248, 15.796477373955195),
    ]]
    fillet(cong_1_edges, radius=CONG_1_R)

    # Esquisse15 → Plots (add)
    with BuildSketch(Plane(origin=(0, -8.017562452687361, 1.113550340651021), x_dir=(1, 0, 0), z_dir=(0, -0.9904922731777517, 0.13756837127468763))):
        with Locations(Location((2.9e-16, 42.80161836794882, 0), (0, 0, 108.724380079))):
            Circle(ESQUISSE15_R)
        with Locations(Location((-7.497331899398751, 20.925330662597844, 0), (0, 0, 90))):
            Circle(ESQUISSE15_R_2)
        with Locations(Location((7.497331899398758, 20.925330662597844, 0), (0, 0, 90))):
            Circle(ESQUISSE15_R)
    extrude(amount=PLOTS_DEPTH)

    # Congé2
    # the kernel refuses this fillet: 3 mm, written as the material it adds along each edge
    with BuildSketch(Plane(origin=(1.78e-15, 1.6332628099632935, 19.959494567666457), x_dir=(0.35822590851954383, -0.12843863786029408, -0.9247581925941178), z_dir=(0.9336349385414768, 0.04928055478342888, 0.35481999444068824))) as cong_2_piece_1_section:
        with BuildLine():
            CenterArc((9.000000000000002 + CONG_2_R, -CONG_2_R), CONG_2_R, 90.00000000000004, 89.99999999999994)
            Line((9.000000000000002 + CONG_2_R, 2.21e-15), (9.000000000000002, 1.8e-16))
            Line((9.000000000000002, 1.8e-16), (9, -CONG_2_R))
        make_face()
    cong_2_piece_1 = revolve(axis=Axis((1.78e-15, 1.6332628099632935, 19.959494567666457), (0, 0.9904922731777516, -0.1375683712746876)), revolution_arc=152.56654818733762, mode=Mode.PRIVATE)
    cong_2_piece_1 = split(cong_2_piece_1, bisect_by=Plane(origin=(-5.829288306162035, 1.9606399234111627, 11.490129183953822), z_dir=(0, -0.9981241208460079, -0.06122286652374182)), keep=Keep.TOP, mode=Mode.PRIVATE)
    cong_2_piece_1 = split(cong_2_piece_1, bisect_by=Plane(origin=(-4.999999999999999, 0.20726603270333405, 11.382580860619012), z_dir=(-1, 0, 0)), keep=Keep.TOP, mode=Mode.PRIVATE)
    add(cong_2_piece_1)
    with BuildSketch(Plane(origin=(1.78e-15, 1.6332628099632935, 19.959494567666457), x_dir=(0.35822590851954383, -0.12843863786029408, -0.9247581925941178), z_dir=(0.9336349385414768, 0.04928055478342888, 0.35481999444068824))) as cong_2_piece_2_section:
        with BuildLine():
            CenterArc((9.000000000000002 + CONG_2_R, -CONG_2_R), CONG_2_R, 90.00000000000004, 89.99999999999994)
            Line((9.000000000000002 + CONG_2_R, 2.21e-15), (9.000000000000002, 1.8e-16))
            Line((9.000000000000002, 1.8e-16), (9, -CONG_2_R))
        make_face()
    cong_2_piece_2 = revolve(axis=Axis((1.78e-15, 1.6332628099632935, 19.959494567666457), (0, 0.9904922731777516, -0.1375683712746876)), revolution_arc=152.56654818733762, mode=Mode.PRIVATE)
    cong_2_piece_2 = split(cong_2_piece_2, bisect_by=Plane(origin=(-4.627043748081395, -0.571498521512579, 12.079374794654521), z_dir=(0, 0.13756837127468846, 0.9904922731777515)), keep=Keep.TOP, mode=Mode.PRIVATE)
    cong_2_piece_2 = split(cong_2_piece_2, bisect_by=Plane(origin=(-4.627043748081395, -0.5411007570483871, 11.999999999999995), z_dir=(0, 0, 1)), keep=Keep.TOP, mode=Mode.PRIVATE)
    cong_2_piece_2 = split(cong_2_piece_2, bisect_by=Plane(origin=(-4.999999999999999, -0.5411007570483871, 12.298238698796709), z_dir=(1, 0, 0)), keep=Keep.TOP, mode=Mode.PRIVATE)
    add(cong_2_piece_2)
    with BuildSketch(Plane(origin=(1.78e-15, 1.6332628099632935, 19.959494567666457), x_dir=(0.7480846392007623, 0.09129082855548622, 0.6572939655995013), z_dir=(-0.6636033247293638, 0.10291278539046118, 0.7409720548113211))) as cong_2_piece_3_section:
        with BuildLine():
            CenterArc((9.000000000000002 + CONG_2_R, -CONG_2_R), CONG_2_R, 89.99999999999997, 90)
            Line((9.000000000000002 + CONG_2_R, 1.9e-16), (9.000000000000002, 1e-17))
            Line((9.000000000000002, 1e-17), (9.000000000000002, -CONG_2_R))
        make_face()
    cong_2_piece_3 = revolve(axis=Axis((1.78e-15, 1.6332628099632935, 19.959494567666457), (0, 0.9904922731777516, -0.1375683712746876)), revolution_arc=152.56654818733753, mode=Mode.PRIVATE)
    cong_2_piece_3 = split(cong_2_piece_3, bisect_by=Plane(origin=(9.552749313011303, 1.5079185715822936, 18.870902527965296), z_dir=(0, -0.9981241208460079, -0.06122286652374182)), keep=Keep.TOP, mode=Mode.PRIVATE)
    cong_2_piece_3 = split(cong_2_piece_3, bisect_by=Plane(origin=(5.0000000000000036, 0.8435077548904713, 18.83014894442022), z_dir=(1, 0, 0)), keep=Keep.TOP, mode=Mode.PRIVATE)
    add(cong_2_piece_3)
    with BuildSketch(Plane(origin=(1.78e-15, 1.6332628099632935, 19.959494567666457), x_dir=(0.7480846392007623, 0.09129082855548622, 0.6572939655995013), z_dir=(-0.6636033247293638, 0.10291278539046118, 0.7409720548113211))) as cong_2_piece_4_section:
        with BuildLine():
            CenterArc((9.000000000000002 + CONG_2_R, -CONG_2_R), CONG_2_R, 89.99999999999997, 90)
            Line((9.000000000000002 + CONG_2_R, 1.9e-16), (9.000000000000002, 1e-17))
            Line((9.000000000000002, 1e-17), (9.000000000000002, -CONG_2_R))
        make_face()
    cong_2_piece_4 = revolve(axis=Axis((1.78e-15, 1.6332628099632935, 19.959494567666457), (0, 0.9904922731777516, -0.1375683712746876)), revolution_arc=152.56654818733753, mode=Mode.PRIVATE)
    cong_2_piece_4 = split(cong_2_piece_4, bisect_by=Plane(origin=(4.627043710647522, -0.5714984443225815, 12.07937478393369), z_dir=(0, 0.13756837127468846, 0.9904922731777515)), keep=Keep.TOP, mode=Mode.PRIVATE)
    cong_2_piece_4 = split(cong_2_piece_4, bisect_by=Plane(origin=(4.627043710647521, -0.5411006786783885, 11.999999999999995), z_dir=(0, 0, 1)), keep=Keep.TOP, mode=Mode.PRIVATE)
    cong_2_piece_4 = split(cong_2_piece_4, bisect_by=Plane(origin=(5.0000000000000036, -0.5411006786783885, 12.298238696571879), z_dir=(-1, 0, 0)), keep=Keep.TOP, mode=Mode.PRIVATE)
    add(cong_2_piece_4)


solid = part.part
